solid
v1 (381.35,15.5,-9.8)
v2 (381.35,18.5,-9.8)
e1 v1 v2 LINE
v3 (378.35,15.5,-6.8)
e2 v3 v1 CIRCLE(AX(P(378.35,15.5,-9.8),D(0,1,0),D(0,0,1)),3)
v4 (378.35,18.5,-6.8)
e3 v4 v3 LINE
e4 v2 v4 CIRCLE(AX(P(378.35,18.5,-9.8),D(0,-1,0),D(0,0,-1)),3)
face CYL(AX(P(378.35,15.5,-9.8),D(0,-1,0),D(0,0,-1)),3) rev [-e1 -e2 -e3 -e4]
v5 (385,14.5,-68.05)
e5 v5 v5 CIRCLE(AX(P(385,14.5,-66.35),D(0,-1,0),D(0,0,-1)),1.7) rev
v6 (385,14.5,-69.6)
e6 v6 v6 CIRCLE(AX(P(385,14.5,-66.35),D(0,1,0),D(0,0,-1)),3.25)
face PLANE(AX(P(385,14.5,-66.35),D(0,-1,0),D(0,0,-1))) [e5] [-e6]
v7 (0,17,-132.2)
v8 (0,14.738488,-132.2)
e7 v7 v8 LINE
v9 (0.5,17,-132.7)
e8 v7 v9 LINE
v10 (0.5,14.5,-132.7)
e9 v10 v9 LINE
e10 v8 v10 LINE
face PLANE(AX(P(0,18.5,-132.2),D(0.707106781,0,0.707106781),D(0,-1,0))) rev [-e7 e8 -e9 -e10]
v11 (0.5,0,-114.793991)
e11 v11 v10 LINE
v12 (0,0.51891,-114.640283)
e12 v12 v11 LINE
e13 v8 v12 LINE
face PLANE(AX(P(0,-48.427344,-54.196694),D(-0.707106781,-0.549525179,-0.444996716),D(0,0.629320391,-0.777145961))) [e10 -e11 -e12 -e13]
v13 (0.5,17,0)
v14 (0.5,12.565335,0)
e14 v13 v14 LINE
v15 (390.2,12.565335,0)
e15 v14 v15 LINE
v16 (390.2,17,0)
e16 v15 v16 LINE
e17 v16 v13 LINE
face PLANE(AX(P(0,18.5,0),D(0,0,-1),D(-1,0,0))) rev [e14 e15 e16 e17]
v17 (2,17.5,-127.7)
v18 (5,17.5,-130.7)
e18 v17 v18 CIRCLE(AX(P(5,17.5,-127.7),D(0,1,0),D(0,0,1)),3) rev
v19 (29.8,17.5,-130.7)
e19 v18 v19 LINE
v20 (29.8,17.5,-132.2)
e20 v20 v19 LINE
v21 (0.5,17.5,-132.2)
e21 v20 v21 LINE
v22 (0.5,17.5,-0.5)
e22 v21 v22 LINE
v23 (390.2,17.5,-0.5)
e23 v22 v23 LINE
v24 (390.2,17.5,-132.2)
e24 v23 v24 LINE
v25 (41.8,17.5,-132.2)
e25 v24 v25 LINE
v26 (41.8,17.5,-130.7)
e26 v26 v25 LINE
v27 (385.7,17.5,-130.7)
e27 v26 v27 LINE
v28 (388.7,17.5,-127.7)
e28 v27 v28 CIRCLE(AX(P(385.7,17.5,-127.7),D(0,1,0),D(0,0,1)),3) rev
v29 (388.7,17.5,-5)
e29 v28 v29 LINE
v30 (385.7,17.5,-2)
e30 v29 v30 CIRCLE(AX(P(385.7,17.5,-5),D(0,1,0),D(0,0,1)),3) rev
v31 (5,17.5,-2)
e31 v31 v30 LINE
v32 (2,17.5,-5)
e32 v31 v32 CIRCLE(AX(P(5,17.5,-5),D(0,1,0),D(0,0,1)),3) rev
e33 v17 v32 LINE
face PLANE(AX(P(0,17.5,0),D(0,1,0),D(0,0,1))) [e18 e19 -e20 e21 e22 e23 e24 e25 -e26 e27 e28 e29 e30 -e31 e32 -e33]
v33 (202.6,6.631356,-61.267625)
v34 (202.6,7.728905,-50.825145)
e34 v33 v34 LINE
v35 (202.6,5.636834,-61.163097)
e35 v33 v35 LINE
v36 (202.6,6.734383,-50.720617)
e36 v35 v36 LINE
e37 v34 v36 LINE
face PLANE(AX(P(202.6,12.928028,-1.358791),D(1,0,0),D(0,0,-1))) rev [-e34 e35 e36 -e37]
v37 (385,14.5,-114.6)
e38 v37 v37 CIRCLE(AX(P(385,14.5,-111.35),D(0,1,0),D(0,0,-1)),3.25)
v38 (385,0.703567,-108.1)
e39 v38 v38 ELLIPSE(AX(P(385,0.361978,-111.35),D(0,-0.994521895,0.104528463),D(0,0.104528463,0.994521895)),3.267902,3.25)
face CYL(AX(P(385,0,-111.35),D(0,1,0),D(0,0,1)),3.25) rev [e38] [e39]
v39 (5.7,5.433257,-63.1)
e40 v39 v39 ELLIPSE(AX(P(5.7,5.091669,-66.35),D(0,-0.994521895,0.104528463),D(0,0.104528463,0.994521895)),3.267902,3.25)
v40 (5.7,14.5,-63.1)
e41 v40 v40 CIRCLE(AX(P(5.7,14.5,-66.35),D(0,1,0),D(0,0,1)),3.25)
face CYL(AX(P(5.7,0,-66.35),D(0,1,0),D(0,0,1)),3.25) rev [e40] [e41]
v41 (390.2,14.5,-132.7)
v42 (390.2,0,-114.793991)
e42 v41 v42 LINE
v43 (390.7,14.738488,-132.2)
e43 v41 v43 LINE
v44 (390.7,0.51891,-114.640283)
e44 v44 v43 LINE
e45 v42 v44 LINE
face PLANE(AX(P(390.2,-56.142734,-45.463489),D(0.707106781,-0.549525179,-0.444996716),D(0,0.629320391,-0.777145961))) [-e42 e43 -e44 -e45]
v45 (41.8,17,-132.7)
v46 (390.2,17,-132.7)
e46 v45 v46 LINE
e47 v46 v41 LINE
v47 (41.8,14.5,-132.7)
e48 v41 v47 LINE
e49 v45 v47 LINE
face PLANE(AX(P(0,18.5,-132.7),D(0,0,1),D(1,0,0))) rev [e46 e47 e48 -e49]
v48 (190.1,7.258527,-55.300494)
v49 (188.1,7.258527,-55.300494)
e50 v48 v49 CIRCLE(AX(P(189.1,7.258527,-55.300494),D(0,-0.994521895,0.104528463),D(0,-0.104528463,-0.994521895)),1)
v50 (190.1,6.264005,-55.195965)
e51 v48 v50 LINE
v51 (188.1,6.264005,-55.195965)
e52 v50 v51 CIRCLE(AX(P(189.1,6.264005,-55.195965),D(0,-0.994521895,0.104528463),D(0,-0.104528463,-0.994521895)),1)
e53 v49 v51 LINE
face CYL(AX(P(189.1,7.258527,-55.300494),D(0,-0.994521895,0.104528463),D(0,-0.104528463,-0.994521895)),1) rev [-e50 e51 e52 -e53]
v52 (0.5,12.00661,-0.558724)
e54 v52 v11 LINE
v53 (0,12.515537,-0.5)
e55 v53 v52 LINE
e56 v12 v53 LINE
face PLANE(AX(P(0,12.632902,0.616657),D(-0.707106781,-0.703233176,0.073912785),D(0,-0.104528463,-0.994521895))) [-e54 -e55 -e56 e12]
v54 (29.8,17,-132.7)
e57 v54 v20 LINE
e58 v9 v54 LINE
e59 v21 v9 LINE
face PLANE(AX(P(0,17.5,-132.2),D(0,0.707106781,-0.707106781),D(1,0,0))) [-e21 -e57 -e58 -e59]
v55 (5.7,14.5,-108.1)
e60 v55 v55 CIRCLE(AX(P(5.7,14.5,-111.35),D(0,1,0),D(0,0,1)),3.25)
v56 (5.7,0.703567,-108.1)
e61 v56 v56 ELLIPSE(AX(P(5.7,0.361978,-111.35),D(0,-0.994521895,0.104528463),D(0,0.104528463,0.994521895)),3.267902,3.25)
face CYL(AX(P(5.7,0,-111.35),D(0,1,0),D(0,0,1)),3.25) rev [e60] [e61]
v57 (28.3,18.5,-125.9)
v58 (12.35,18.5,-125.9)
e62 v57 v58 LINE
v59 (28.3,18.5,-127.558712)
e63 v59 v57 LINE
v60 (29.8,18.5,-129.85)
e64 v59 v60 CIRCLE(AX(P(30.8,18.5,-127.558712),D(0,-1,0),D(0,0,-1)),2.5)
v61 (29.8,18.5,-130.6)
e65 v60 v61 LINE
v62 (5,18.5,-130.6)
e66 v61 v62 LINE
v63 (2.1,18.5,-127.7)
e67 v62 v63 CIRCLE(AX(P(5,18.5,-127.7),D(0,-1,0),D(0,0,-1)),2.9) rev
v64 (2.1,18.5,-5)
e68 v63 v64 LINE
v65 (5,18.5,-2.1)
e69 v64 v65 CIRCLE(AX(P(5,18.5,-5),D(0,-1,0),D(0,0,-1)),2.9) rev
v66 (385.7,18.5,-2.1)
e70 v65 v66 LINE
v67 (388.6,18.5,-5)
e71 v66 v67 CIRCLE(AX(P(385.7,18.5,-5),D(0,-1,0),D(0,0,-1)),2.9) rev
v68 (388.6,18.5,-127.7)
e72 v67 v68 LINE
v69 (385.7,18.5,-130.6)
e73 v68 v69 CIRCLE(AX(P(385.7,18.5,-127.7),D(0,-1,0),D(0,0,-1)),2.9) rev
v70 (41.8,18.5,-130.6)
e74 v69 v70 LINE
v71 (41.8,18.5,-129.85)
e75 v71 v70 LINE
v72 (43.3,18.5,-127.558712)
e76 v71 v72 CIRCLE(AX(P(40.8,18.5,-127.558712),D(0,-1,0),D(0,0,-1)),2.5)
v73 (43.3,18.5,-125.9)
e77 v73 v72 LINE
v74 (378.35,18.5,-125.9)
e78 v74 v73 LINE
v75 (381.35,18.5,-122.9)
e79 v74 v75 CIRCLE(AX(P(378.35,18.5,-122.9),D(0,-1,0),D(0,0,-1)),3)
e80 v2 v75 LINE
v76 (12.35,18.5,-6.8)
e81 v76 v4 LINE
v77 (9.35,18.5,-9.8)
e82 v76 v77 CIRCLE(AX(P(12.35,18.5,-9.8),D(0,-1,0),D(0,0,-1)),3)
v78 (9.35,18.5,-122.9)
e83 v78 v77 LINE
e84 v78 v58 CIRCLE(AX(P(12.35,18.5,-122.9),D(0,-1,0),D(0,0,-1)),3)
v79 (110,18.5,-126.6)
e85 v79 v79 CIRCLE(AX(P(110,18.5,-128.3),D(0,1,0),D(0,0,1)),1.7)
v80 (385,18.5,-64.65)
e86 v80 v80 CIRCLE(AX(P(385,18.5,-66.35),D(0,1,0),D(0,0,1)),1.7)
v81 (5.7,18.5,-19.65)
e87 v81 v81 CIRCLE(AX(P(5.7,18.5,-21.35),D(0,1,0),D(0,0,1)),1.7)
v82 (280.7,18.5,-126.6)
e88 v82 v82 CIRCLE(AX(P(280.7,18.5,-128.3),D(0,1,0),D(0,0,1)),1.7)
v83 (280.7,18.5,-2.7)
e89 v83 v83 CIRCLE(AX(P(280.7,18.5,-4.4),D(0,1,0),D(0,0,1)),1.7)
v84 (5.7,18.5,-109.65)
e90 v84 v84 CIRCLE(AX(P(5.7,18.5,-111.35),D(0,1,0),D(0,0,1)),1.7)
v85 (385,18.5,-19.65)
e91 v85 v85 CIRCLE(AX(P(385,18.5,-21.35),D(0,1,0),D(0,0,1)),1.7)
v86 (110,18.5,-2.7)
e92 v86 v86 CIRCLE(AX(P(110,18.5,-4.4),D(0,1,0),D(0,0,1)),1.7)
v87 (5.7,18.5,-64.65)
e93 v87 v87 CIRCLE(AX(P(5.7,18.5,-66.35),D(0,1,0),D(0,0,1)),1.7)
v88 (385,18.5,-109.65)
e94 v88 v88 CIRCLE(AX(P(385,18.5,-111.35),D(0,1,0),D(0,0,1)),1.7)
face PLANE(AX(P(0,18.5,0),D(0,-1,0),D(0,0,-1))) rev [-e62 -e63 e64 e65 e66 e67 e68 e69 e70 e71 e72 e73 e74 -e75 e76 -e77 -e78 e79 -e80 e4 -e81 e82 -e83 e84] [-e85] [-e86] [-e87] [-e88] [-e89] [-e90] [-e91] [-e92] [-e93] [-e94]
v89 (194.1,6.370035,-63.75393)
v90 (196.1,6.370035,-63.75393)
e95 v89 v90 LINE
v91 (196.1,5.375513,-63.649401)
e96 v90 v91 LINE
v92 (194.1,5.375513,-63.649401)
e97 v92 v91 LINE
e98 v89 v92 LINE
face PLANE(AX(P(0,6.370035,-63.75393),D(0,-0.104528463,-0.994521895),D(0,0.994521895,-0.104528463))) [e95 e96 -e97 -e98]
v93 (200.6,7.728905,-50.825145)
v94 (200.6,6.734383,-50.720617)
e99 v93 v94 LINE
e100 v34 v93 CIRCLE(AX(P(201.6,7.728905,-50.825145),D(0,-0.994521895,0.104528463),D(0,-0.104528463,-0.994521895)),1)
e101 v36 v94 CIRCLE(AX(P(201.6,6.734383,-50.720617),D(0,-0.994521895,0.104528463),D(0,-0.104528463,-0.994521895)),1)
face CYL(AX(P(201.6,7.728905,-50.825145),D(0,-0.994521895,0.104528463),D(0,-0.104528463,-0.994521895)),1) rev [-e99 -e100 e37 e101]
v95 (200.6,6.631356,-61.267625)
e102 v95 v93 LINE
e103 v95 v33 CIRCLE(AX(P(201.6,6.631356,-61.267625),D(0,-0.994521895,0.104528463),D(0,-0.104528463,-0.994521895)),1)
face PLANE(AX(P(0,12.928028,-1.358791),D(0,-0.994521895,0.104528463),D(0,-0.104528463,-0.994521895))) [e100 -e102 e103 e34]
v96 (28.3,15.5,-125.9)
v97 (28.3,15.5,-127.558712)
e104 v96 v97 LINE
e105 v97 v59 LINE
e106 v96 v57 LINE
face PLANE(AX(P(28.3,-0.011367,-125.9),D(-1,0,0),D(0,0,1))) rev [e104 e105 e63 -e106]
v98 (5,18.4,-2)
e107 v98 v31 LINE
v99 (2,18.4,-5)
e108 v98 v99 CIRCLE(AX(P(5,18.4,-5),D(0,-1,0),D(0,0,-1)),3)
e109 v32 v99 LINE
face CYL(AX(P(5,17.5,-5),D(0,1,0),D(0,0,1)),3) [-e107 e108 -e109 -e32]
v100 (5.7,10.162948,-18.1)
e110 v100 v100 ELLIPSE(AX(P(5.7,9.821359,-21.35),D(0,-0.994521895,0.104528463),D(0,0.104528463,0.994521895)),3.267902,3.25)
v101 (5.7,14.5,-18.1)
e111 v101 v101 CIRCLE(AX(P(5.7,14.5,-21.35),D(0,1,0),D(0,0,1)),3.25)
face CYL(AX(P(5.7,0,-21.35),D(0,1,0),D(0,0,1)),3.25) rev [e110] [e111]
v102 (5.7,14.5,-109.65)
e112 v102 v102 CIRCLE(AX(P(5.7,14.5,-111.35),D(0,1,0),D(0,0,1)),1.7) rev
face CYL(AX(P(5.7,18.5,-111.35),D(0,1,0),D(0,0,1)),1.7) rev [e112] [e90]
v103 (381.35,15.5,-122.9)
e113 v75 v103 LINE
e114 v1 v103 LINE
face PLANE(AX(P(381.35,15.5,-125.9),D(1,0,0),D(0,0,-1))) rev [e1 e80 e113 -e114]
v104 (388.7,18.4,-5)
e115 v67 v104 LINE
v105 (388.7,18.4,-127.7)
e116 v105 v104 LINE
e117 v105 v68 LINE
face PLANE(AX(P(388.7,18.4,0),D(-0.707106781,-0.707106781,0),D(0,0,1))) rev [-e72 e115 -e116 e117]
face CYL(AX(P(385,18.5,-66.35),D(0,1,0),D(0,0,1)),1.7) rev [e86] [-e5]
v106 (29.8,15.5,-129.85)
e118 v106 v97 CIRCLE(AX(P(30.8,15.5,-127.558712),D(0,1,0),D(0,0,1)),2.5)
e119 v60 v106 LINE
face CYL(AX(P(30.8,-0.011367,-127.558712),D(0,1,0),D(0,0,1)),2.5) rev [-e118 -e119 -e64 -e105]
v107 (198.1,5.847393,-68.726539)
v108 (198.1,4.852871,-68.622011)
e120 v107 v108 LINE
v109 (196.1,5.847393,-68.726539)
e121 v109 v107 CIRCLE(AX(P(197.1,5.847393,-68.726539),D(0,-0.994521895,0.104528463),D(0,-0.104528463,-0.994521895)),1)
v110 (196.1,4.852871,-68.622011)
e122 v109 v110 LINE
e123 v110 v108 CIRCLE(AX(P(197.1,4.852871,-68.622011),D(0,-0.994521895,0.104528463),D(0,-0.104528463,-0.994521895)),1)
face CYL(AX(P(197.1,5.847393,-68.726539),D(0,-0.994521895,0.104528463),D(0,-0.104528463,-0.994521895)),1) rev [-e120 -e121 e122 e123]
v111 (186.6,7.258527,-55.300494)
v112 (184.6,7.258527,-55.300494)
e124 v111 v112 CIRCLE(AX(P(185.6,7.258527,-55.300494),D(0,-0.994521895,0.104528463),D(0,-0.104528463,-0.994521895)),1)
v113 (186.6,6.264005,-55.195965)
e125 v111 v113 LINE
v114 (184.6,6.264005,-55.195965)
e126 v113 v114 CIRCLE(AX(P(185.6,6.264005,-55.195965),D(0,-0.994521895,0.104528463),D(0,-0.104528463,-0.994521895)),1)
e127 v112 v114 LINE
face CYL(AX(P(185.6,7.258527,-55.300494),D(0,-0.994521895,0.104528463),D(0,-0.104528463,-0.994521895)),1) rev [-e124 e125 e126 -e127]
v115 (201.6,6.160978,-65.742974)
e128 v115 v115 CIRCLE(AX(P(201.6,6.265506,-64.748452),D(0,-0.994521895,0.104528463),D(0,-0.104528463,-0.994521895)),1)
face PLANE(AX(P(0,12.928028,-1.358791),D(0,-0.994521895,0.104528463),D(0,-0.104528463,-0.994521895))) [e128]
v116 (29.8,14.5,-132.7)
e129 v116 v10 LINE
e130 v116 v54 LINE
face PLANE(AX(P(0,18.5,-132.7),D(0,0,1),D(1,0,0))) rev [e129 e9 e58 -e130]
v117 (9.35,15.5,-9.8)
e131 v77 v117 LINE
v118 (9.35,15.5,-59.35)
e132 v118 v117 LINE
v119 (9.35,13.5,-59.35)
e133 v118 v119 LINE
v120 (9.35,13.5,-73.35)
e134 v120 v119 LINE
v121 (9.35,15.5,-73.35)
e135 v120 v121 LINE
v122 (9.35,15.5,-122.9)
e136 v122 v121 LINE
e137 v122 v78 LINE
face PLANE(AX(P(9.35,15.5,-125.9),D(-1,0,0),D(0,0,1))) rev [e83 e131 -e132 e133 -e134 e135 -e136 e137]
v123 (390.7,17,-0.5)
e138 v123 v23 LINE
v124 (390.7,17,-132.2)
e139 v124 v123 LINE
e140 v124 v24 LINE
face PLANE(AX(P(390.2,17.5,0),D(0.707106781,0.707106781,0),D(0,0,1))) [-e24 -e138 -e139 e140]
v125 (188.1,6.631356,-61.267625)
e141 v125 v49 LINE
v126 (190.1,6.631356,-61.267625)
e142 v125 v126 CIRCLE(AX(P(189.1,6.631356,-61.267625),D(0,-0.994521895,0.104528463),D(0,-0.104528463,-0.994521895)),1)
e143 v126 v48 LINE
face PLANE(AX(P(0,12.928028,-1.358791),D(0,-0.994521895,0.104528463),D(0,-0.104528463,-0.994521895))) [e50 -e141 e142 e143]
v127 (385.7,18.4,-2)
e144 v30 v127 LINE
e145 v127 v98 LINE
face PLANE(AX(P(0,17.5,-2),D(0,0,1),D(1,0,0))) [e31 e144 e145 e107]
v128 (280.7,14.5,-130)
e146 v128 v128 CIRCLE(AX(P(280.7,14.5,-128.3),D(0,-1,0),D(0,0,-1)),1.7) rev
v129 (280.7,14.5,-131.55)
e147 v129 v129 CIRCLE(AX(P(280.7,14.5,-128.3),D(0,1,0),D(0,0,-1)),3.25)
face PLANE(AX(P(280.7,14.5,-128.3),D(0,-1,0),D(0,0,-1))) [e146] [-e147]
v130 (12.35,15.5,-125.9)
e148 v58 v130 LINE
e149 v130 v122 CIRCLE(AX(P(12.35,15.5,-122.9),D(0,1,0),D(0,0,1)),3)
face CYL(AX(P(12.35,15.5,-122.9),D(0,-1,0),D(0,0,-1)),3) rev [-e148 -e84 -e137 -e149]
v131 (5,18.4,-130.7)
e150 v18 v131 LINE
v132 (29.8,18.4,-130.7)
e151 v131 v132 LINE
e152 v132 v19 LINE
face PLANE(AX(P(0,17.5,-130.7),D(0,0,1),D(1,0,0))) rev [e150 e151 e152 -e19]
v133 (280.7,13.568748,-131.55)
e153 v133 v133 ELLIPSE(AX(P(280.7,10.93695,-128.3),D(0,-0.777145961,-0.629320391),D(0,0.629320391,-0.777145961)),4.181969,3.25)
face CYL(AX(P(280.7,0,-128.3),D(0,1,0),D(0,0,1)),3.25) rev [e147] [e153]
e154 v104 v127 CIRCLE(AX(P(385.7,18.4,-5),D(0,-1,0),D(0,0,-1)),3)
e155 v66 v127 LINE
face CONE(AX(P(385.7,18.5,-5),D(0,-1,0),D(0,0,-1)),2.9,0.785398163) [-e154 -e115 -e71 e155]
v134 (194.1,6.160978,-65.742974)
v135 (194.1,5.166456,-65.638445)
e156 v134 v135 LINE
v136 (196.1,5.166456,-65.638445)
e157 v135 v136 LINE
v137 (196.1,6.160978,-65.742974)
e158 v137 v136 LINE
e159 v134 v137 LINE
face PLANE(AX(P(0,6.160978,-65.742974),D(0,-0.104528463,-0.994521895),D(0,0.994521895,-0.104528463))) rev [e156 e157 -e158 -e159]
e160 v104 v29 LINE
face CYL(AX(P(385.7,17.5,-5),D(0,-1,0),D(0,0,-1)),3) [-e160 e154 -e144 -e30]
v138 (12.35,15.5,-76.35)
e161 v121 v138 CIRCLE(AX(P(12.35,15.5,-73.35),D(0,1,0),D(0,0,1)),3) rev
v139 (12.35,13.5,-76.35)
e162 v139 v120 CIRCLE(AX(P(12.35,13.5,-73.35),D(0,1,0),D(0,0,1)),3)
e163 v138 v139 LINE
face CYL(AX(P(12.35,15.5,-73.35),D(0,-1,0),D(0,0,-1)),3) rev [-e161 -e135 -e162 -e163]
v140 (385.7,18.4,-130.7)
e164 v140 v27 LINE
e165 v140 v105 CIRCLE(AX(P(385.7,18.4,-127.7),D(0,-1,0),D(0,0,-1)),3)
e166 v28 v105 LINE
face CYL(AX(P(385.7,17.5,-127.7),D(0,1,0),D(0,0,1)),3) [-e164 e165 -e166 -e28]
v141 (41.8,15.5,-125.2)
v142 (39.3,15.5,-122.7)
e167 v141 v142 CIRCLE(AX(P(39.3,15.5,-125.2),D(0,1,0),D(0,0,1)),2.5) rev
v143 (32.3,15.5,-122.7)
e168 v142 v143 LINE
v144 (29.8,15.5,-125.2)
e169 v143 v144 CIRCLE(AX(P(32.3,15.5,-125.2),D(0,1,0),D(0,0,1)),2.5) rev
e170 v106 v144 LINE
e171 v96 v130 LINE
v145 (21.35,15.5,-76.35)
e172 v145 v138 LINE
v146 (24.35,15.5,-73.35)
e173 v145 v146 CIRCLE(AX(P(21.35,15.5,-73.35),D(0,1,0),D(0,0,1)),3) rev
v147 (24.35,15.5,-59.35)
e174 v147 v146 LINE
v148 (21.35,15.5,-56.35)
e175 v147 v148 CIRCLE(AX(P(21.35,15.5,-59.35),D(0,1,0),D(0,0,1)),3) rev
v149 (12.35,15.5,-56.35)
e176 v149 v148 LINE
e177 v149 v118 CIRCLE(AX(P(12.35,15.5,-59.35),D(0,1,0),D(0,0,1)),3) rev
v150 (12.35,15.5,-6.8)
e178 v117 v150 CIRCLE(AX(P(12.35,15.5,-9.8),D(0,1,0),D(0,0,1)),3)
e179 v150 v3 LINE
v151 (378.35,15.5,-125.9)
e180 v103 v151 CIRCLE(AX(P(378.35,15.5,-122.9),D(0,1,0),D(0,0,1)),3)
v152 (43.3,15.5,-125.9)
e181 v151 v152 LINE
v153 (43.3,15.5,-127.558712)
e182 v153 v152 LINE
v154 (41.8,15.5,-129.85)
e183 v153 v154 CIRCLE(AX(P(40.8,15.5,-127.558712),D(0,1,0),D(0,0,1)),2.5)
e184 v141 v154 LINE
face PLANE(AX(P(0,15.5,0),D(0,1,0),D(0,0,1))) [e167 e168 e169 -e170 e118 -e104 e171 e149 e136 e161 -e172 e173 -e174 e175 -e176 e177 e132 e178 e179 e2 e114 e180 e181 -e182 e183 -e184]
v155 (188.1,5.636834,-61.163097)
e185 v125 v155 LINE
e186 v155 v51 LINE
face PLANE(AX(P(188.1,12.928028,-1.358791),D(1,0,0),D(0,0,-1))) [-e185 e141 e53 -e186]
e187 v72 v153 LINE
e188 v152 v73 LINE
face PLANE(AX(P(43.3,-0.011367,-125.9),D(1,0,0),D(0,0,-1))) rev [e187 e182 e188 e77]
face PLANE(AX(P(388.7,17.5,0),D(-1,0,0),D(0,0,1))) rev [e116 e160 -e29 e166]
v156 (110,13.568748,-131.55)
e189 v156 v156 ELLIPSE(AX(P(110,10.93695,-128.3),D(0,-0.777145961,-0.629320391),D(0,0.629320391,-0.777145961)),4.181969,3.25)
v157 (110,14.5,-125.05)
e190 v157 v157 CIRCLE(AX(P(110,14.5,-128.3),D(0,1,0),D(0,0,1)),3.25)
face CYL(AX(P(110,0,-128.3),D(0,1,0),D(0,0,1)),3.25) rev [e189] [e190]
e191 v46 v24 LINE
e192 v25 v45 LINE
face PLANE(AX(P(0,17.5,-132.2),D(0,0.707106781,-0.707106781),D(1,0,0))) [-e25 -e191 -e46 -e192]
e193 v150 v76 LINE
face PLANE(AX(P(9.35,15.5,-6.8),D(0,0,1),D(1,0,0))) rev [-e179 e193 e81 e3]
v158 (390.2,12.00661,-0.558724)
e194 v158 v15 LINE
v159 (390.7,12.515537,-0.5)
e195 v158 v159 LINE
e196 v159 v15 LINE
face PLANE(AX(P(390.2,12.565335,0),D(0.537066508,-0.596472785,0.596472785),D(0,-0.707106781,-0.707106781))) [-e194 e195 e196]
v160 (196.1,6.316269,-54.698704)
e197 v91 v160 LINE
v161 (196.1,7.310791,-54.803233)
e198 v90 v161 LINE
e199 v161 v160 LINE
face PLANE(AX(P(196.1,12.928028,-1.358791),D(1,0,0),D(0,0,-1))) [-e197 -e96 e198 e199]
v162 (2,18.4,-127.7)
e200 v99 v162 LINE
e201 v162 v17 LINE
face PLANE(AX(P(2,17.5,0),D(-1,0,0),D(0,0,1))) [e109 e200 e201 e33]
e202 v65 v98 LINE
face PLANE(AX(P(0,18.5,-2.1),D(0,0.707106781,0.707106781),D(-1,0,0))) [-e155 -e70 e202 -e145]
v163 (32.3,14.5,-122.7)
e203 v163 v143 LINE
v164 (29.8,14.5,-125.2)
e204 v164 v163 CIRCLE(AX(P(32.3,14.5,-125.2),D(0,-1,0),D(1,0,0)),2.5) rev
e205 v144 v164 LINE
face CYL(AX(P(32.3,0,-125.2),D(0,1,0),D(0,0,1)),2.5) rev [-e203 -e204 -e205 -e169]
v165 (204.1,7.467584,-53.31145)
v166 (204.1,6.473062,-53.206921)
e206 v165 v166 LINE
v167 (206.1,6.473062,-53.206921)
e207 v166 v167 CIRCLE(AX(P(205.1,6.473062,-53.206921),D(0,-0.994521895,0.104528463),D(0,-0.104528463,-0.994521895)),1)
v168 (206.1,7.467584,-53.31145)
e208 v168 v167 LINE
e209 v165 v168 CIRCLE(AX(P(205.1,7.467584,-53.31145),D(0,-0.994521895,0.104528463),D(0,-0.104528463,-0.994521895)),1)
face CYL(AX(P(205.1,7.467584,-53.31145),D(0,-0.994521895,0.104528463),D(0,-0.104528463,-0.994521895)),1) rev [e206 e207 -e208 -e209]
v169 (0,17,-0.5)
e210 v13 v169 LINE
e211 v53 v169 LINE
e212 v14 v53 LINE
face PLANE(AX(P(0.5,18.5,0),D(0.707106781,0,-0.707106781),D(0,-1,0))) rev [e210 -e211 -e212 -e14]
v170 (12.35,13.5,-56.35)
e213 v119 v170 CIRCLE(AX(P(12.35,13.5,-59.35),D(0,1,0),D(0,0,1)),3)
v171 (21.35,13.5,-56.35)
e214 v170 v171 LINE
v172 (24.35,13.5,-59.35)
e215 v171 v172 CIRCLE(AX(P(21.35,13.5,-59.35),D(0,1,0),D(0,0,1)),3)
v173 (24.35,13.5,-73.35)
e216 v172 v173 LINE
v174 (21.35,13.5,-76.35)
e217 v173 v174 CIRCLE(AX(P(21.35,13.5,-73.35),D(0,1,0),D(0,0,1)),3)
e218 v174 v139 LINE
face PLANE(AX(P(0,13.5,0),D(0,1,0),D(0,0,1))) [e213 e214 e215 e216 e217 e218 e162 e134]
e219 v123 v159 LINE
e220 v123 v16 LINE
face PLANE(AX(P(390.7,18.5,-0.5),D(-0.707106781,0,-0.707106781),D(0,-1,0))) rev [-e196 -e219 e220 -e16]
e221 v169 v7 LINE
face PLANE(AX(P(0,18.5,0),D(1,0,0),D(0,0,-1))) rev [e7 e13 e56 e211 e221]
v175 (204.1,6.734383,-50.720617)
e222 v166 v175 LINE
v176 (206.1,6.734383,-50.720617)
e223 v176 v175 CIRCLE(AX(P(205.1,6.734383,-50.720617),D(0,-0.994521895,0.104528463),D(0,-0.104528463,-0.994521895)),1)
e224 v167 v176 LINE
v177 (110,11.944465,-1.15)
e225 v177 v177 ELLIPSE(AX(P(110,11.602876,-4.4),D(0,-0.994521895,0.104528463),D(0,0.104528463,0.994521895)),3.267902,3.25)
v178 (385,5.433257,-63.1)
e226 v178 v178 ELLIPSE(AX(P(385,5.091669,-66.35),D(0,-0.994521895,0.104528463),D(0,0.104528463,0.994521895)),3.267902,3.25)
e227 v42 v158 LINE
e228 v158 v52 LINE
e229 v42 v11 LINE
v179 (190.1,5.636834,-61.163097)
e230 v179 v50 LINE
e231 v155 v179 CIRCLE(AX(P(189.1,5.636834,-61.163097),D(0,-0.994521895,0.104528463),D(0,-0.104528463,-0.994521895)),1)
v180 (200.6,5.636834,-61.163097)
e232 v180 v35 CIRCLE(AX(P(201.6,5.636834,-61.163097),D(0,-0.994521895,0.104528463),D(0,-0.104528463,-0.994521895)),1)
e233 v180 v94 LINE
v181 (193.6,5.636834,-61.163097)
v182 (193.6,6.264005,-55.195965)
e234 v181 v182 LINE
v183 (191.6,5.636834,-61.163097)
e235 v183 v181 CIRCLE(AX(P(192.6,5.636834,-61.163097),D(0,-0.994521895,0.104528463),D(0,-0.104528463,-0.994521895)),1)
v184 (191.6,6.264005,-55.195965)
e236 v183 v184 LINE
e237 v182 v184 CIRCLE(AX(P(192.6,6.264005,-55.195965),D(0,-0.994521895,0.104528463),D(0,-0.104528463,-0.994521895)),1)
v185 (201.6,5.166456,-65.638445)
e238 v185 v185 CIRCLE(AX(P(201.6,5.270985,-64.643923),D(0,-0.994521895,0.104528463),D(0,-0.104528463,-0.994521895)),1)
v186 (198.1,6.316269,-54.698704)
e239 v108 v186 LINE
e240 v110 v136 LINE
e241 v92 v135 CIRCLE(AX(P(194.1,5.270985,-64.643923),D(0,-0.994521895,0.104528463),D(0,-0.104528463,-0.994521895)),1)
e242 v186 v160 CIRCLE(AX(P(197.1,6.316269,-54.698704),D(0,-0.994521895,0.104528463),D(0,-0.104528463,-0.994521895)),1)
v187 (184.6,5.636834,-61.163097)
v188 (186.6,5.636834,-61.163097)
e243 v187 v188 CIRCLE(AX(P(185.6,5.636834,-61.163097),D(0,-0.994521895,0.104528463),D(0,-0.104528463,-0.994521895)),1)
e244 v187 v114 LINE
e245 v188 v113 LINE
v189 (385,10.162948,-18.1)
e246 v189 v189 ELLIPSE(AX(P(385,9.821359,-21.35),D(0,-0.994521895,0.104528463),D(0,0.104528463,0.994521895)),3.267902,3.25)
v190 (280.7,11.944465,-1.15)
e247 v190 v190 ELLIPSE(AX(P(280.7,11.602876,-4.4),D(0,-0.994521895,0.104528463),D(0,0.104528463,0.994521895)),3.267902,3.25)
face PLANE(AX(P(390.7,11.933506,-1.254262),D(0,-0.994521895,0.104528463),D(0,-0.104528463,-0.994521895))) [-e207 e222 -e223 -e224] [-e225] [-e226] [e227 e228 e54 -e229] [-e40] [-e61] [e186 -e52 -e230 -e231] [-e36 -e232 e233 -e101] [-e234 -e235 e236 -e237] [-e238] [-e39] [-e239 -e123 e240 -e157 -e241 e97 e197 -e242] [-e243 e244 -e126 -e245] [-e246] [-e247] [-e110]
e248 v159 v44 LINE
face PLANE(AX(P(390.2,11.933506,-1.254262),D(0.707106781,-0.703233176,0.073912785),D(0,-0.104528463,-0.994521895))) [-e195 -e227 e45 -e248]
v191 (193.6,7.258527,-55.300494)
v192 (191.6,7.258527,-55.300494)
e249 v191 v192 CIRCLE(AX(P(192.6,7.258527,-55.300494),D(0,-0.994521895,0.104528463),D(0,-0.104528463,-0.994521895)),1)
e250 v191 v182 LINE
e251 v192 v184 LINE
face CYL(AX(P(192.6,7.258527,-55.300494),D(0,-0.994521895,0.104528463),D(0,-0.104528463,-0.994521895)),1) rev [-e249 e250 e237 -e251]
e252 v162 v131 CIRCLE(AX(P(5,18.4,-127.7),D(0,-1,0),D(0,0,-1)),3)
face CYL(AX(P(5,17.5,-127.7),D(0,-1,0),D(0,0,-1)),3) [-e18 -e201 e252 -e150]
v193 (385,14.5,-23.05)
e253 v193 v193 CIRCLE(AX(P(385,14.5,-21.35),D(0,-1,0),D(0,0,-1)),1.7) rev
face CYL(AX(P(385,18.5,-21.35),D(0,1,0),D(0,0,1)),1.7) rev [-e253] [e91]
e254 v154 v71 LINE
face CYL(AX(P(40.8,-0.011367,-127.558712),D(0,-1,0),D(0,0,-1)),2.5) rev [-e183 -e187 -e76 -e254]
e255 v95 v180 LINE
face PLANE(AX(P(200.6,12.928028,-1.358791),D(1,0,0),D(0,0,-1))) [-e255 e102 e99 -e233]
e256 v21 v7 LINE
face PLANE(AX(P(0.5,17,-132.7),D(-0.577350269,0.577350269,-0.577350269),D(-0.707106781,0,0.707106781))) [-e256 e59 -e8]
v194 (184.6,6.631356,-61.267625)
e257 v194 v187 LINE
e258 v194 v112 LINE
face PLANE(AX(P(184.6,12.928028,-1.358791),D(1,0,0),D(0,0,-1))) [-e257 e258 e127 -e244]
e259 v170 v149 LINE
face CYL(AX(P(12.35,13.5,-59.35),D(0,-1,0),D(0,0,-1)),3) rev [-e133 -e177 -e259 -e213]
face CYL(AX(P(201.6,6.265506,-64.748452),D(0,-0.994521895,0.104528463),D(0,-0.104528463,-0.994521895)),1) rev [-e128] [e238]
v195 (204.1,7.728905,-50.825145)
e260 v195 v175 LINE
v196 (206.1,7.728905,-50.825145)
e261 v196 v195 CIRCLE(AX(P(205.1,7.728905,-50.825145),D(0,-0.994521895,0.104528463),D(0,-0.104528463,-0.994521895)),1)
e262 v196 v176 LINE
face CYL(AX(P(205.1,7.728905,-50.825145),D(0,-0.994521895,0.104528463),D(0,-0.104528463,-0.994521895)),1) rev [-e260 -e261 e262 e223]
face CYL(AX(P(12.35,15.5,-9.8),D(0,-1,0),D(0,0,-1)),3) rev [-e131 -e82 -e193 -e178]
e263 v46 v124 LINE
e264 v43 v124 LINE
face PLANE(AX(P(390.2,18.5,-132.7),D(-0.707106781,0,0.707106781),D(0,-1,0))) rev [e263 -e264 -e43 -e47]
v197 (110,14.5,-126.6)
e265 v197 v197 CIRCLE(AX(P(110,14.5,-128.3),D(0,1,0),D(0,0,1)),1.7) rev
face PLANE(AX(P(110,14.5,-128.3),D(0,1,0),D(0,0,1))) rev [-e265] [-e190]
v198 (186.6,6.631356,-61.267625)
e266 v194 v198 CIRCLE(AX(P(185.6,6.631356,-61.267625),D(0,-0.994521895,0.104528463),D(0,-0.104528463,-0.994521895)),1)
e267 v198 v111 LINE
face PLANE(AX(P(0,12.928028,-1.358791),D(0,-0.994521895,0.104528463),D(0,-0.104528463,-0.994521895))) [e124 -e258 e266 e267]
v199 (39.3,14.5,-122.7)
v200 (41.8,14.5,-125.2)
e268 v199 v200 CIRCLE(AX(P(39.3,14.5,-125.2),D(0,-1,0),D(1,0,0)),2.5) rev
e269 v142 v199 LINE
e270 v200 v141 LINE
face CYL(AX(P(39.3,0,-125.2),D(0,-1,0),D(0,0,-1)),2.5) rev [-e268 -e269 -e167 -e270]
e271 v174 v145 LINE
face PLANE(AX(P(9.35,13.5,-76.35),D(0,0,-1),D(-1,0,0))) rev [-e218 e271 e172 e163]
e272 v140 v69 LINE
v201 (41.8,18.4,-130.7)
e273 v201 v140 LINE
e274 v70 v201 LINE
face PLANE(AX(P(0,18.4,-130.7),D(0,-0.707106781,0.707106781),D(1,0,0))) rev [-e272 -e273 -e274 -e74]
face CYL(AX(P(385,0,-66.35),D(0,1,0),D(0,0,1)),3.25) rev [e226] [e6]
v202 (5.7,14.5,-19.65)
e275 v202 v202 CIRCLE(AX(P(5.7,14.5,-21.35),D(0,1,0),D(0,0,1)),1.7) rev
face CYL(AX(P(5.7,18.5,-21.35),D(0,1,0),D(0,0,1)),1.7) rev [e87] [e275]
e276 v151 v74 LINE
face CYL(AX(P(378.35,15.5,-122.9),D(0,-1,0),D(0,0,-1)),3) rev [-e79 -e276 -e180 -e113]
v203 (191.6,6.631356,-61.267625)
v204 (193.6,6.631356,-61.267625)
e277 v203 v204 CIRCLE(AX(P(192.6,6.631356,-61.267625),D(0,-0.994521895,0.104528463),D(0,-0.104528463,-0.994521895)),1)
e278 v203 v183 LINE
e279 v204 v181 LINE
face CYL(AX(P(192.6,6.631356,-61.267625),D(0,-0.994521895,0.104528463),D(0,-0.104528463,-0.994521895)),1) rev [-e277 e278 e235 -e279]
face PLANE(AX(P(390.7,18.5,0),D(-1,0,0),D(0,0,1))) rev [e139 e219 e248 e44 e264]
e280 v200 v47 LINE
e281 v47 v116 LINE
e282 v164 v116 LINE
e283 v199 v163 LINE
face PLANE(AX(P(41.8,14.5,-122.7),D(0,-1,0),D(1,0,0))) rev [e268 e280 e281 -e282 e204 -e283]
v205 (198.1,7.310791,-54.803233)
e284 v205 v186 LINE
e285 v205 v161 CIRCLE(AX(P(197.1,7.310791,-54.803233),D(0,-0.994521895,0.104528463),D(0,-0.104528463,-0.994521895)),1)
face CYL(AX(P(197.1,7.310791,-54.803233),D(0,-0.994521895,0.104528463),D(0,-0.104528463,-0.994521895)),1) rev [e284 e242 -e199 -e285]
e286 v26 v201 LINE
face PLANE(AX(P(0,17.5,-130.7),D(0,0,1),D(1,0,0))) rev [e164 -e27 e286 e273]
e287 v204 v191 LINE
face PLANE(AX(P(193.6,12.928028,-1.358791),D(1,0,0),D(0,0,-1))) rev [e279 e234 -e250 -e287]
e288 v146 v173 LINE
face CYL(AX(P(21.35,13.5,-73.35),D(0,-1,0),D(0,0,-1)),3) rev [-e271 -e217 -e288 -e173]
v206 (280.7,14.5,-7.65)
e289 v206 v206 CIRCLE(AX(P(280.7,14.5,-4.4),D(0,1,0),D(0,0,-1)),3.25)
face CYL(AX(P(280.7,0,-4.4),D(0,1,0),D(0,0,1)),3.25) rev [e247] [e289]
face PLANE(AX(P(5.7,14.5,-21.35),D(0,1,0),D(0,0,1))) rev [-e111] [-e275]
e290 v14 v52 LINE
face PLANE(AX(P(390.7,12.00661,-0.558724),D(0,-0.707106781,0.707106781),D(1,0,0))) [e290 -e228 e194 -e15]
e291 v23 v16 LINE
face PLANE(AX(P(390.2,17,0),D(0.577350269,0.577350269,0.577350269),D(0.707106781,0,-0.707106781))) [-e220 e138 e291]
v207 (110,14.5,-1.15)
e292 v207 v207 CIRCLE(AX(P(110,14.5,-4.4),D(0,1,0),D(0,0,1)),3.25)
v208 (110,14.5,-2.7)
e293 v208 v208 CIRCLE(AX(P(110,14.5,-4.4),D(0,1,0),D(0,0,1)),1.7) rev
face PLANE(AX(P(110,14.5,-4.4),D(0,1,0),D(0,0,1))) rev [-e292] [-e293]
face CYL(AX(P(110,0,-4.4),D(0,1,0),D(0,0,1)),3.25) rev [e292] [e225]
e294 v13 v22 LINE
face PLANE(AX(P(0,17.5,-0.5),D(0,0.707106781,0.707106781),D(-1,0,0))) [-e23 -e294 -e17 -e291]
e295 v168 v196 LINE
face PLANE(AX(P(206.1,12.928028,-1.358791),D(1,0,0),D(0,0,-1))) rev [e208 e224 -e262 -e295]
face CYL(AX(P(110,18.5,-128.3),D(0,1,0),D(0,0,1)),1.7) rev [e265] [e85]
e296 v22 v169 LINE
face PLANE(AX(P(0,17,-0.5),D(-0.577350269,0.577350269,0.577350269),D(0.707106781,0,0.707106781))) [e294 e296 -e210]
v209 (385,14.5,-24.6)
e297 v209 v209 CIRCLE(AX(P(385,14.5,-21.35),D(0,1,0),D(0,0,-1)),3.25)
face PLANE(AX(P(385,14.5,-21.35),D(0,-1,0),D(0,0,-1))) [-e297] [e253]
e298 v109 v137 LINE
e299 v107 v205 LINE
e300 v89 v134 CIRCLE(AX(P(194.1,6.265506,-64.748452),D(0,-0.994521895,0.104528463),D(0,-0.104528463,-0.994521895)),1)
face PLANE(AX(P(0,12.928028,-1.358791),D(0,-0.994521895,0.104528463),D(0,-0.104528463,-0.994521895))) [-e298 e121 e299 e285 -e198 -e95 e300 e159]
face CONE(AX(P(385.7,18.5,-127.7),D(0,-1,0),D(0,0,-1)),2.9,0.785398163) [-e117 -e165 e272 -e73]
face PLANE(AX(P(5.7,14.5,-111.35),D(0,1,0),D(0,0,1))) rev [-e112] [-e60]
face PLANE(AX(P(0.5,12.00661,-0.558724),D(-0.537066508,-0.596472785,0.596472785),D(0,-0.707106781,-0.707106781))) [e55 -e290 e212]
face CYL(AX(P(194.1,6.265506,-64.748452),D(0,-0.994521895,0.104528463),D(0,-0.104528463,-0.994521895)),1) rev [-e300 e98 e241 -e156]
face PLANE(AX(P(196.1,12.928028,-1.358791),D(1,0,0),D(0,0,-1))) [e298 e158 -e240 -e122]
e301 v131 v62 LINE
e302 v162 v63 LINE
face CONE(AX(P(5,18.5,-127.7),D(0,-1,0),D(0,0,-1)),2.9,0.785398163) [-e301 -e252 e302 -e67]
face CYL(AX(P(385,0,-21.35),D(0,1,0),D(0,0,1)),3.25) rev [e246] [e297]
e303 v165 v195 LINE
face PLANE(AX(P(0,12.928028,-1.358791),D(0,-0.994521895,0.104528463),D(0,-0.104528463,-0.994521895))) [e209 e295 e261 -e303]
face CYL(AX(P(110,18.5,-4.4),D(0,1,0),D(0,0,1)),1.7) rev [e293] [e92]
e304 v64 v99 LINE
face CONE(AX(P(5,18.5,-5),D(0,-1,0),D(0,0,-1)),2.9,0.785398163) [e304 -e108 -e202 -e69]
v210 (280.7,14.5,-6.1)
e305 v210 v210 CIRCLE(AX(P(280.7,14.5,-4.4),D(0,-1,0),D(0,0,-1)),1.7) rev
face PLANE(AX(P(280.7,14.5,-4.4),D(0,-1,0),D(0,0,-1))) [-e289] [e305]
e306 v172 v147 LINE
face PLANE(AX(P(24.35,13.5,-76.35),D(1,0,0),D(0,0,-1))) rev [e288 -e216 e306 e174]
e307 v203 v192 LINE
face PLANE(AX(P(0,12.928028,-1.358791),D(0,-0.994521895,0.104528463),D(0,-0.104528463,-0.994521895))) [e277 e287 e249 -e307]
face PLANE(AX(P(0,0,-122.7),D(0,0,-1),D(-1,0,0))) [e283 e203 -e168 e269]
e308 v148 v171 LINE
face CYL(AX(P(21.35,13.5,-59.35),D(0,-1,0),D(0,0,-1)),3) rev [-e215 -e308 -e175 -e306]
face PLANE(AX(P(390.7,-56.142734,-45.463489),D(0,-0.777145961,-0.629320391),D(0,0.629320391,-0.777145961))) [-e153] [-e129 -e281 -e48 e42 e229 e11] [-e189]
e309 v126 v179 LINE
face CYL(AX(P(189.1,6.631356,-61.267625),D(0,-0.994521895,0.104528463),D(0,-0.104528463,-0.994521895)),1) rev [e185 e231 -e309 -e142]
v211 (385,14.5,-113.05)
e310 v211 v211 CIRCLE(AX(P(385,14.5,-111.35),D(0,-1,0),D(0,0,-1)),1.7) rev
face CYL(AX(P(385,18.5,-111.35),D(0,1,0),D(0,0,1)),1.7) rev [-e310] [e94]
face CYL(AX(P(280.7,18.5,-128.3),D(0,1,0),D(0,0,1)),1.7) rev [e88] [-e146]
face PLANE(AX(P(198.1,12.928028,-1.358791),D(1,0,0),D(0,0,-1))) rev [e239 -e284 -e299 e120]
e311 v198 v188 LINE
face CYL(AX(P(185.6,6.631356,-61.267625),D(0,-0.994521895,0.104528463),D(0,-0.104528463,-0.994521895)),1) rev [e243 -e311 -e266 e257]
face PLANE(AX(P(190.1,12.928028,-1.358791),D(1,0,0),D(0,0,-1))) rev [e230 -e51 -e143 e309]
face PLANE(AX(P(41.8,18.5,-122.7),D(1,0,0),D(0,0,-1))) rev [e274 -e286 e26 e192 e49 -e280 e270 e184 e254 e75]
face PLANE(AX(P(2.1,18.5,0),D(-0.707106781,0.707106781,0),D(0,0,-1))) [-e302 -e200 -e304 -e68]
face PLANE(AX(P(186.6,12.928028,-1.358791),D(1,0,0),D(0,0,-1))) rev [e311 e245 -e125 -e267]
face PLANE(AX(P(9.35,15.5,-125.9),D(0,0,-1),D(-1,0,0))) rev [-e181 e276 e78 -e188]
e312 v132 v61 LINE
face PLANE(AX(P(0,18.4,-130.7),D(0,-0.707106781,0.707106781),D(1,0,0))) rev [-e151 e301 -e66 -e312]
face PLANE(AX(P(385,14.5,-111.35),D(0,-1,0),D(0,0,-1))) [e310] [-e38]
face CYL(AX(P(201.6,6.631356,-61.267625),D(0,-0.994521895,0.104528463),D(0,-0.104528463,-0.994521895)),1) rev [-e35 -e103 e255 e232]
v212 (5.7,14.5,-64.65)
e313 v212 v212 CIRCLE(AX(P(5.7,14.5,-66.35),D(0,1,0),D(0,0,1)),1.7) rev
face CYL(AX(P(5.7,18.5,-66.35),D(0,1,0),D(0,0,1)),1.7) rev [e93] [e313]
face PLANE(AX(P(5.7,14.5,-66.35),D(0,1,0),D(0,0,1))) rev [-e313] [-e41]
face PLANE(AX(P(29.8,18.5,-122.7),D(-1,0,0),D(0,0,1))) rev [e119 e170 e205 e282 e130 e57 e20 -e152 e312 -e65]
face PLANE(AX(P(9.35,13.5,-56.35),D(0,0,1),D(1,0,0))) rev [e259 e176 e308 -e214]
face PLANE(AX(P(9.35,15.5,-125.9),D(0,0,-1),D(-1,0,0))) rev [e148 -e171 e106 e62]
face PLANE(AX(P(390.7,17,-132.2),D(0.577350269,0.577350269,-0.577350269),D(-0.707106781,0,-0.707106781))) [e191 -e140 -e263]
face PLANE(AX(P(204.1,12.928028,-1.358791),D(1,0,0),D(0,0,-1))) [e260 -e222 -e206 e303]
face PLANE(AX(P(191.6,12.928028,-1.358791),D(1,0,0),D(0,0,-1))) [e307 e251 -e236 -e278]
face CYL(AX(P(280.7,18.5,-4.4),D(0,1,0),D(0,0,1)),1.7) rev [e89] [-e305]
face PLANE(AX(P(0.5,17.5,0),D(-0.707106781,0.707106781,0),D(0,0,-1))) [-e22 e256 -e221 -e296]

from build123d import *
from OCP.BRepFilletAPI import BRepFilletAPI_MakeChamfer

# Parameters (mm, degrees)
SKETCH1_W            = 390.7
SKETCH1_H            = 132.7
MAINBODY_DEPTH       = 18.5
SKETCH2_W            = 390.7
SKETCH2_H            = 132.7
SKETCH2_W_2          = 386.7
SKETCH2_H_2          = 128.7
ALIGMENTLIP_DEPTH    = 1
TYPINGANGLE_DEPTH    = 414.035143783
SKETCH4_W            = 372
SKETCH4_H            = 119.1
PCBCUTOUT_DEPTH      = 3
M3_CLEARANCE_HOLE1_D = 3.4
CUT_EXTRUDE2_START   = -1
SKETCH11_R           = 3.25
CUT_EXTRUDE2_DEPTH   = 412.911649145
SKETCH13_W           = 15
SKETCH13_H           = 20
CUT_EXTRUDE4_DEPTH   = 2
FILLET2_R            = 3
CHAMFER1_SIZE        = 0.5
CHAMFER1_SIZE2       = 0.561801899
CHAMFER2_SIZE        = 0.1
SKETCH17_R           = 1
SKETCH17_W           = 2
SKETCH17_H           = 2
CUT_EXTRUDE5_DEPTH   = 1
SKETCH18_W           = 12
SKETCH18_H           = 4
CUT_EXTRUDE6_DEPTH   = 10
SKETCH12_W           = 15
SKETCH12_H           = 3.95
CUT_EXTRUDE3_DEPTH   = 3
FILLET1_R            = 2.5


with BuildPart() as part:
    # Sketch1 → MainBody (new body)
    with BuildSketch(Plane(origin=(0, 0, 0), x_dir=(1, 0, 0), z_dir=(0, 1, 0))):
        with Locations((195.35, 66.35)):
            Rectangle(SKETCH1_W, SKETCH1_H)
    extrude(amount=MAINBODY_DEPTH)

    # Sketch2 → AligmentLip (cut)
    with BuildSketch(Plane(origin=(0, 18.5, 0), x_dir=(1, 0, 0), z_dir=(0, 1, 0))):
        with Locations((195.35, 66.35)):
            Rectangle(SKETCH2_W, SKETCH2_H)
        with Locations((195.35, 66.35)):
            Rectangle(SKETCH2_W_2, SKETCH2_H_2, mode=Mode.SUBTRACT)
    extrude(amount=-ALIGMENTLIP_DEPTH, mode=Mode.SUBTRACT)

    # Sketch3 → TypingAngle (cut, through all)
    with BuildSketch(Plane.ZY):
        Polygon((-114.79399123, 0), (-132.7, 14.5), (-132.7, 0), align=None)
        Polygon((0, 12.065334661), (-114.79399123, 0), (0, 0), align=None)
    extrude(amount=-TYPINGANGLE_DEPTH, mode=Mode.SUBTRACT)

    # Sketch4 → PCBCutout (cut)
    with BuildSketch(Plane(origin=(0, 18.5, 0), x_dir=(1, 0, 0), z_dir=(0, 1, 0))):
        with Locations((195.35, 66.35)):
            Rectangle(SKETCH4_W, SKETCH4_H)
    extrude(amount=-PCBCUTOUT_DEPTH, mode=Mode.SUBTRACT)

    # M3 Clearance Hole1 (through all)
    with Locations(Plane(origin=(110, 18.5, -128.3), x_dir=(0, 0, 1), z_dir=(0, 1, 0))):
        with Locations((0, 0), (16.95, -104.3), (61.95, -104.3), (106.95, -104.3), (123.9, 0), (0, 170.7), (123.9, 170.7), (106.95, 275), (61.95, 275), (16.95, 275)):
            Hole(M3_CLEARANCE_HOLE1_D / 2)

    # Sketch11 → Cut-Extrude2 (cut, through all)
    with BuildSketch(Plane(origin=(0, 15.5, 0), x_dir=(1, 0, 0), z_dir=(0, 1, 0)).offset(CUT_EXTRUDE2_START)):
        with Locations(Location((110, 128.3, 0), (0, 0, 270))):
            Circle(SKETCH11_R)
        with Locations(Location((5.7, 111.35, 0), (0, 0, 270))):
            Circle(SKETCH11_R)
        with Locations(Location((5.7, 66.35, 0), (0, 0, 270))):
            Circle(SKETCH11_R)
        with Locations(Location((5.7, 21.35, 0), (0, 0, 270))):
            Circle(SKETCH11_R)
        with Locations(Location((110, 4.4, 0), (0, 0, 270))):
            Circle(SKETCH11_R)
        with Locations(Location((280.7, 4.4, 0), (0, 0, 270))):
            Circle(SKETCH11_R)
        with Locations(Location((385, 21.35, 0), (0, 0, 270))):
            Circle(SKETCH11_R)
        with Locations(Location((385, 66.35, 0), (0, 0, 270))):
            Circle(SKETCH11_R)
        with Locations(Location((385, 111.35, 0), (0, 0, 270))):
            Circle(SKETCH11_R)
        with Locations(Location((280.7, 128.3, 0), (0, 0, 90))):
            Circle(SKETCH11_R)
    extrude(amount=-CUT_EXTRUDE2_DEPTH, mode=Mode.SUBTRACT)

    # Sketch13 → Cut-Extrude4 (cut)
    with BuildSketch(Plane(origin=(0, 15.5, 0), x_dir=(1, 0, 0), z_dir=(0, 1, 0))):
        with Locations((16.85, 66.35)):
            Rectangle(SKETCH13_W, SKETCH13_H)
    extrude(amount=-CUT_EXTRUDE4_DEPTH, mode=Mode.SUBTRACT)

    # Fillet2
    fillet2_edges = [part.edges().sort_by_distance(p)[0] for p in [
        (388.7, 18, -130.7),
        (2, 18, -130.7),
        (2, 18, -2),
        (9.35, 14.5, -56.35),
        (9.35, 14.5, -76.35),
        (24.35, 14.5, -76.35),
        (24.35, 14.5, -56.35),
        (388.7, 18, -2),
        (9.35, 17, -6.8),
        (9.35, 17, -125.9),
        (381.35, 17, -125.9),
        (381.35, 17, -6.8),
    ]]
    fillet(fillet2_edges, radius=FILLET2_R)

    # Chamfer1: one chamfer whose edges measure the first distance from different faces: ONE call of the kernel's chamfer builder (chamfer() names one face for all edges)
    chamfer1_edges_1 = [part.edges().sort_by_distance(p)[0] for p in [
        (0, 16, -132.7),
        (390.7, 16, -132.7),
        (390.7, 14.782667331, 0),
        (0, 14.782667331, 0),
        (195.35, 17.5, -132.7),
        (390.7, 17.5, -66.35),
        (195.35, 17.5, 0),
        (0, 17.5, -66.35),
        (0, 7.25, -123.746995615),
        (390.7, 7.25, -123.746995615),
        (0, 6.032667331, -57.396995615),
        (390.7, 6.032667331, -57.396995615),
    ]]
    chamfer1_edges_2 = [part.edges().sort_by_distance(p)[0] for p in [
        (195.35, 12.065334661, 0),
    ]]
    chamfer1_side_2 = [part.faces().sort_by_distance(p)[0] for p in [
        (195.35, 14.782667331, 0),
    ]]
    chamfer1 = BRepFilletAPI_MakeChamfer(part.part.solid().wrapped)
    for e in chamfer1_edges_1:
        chamfer1.Add(CHAMFER1_SIZE, e.wrapped)
    for e in chamfer1_edges_2:
        chamfer1.Add(CHAMFER1_SIZE, CHAMFER1_SIZE2, e.wrapped, chamfer1_side_2[0].wrapped)  # the first distance lies on this face
    add(Compound.cast(chamfer1.Shape()), mode=Mode.REPLACE)

    # Chamfer2
    chamfer2_edges = [part.edges().sort_by_distance(p)[0] for p in [
        (388.7, 18.5, -66.35),
        (195.35, 18.5, -130.7),
        (2, 18.5, -66.35),
        (195.35, 18.5, -2),
        (2.878679656, 18.5, -129.821320344),
        (2.878679656, 18.5, -2.878679656),
        (387.821320344, 18.5, -2.878679656),
        (387.821320344, 18.5, -129.821320344),
    ]]
    chamfer(chamfer2_edges, length=CHAMFER2_SIZE)

    # Sketch17 → Cut-Extrude5 (cut)
    with BuildSketch(Plane(origin=(0, 11.933506406, -1.254262065), x_dir=(1, 0, 0), z_dir=(0, -0.9945218953682734, 0.10452846326765429))):
        with Locations((205.1, -52.238829109)):
            Circle(SKETCH17_R)
        with BuildLine():
            ThreePointArc((204.1, -52.238829109), (205.1, -51.238829109), (206.1, -52.238829109))
            Line((206.1, -52.238829109), (206.1, -49.738829109))
            ThreePointArc((206.1, -49.738829109), (205.1, -50.738829109), (204.1, -49.738829109))
            Line((204.1, -49.738829109), (204.1, -52.238829109))
        make_face()
        with Locations((205.1, -49.738829109)):
            Circle(SKETCH17_R)
        with Locations((201.6, -49.738829109)):
            Circle(SKETCH17_R)
        with BuildLine():
            ThreePointArc((200.6, -60.238829109), (201.6, -59.238829109), (202.6, -60.238829109))
            Line((202.6, -60.238829109), (202.6, -49.738829109))
            ThreePointArc((202.6, -49.738829109), (201.6, -50.738829109), (200.6, -49.738829109))
            Line((200.6, -49.738829109), (200.6, -60.238829109))
        make_face()
        with Locations((201.6, -60.238829109)):
            Circle(SKETCH17_R)
        with Locations((197.1, -53.738829109)):
            Circle(SKETCH17_R)
        with BuildLine():
            Line((196.1, -62.738829109), (198.1, -62.738829109))
            Line((198.1, -62.738829109), (198.1, -53.738829109))
            ThreePointArc((198.1, -53.738829109), (197.1, -54.738829109), (196.1, -53.738829109))
            Line((196.1, -53.738829109), (196.1, -62.738829109))
        make_face()
        with Locations((197.1, -63.738829109)):
            Rectangle(SKETCH17_W, SKETCH17_H)
        with BuildLine():
            ThreePointArc((196.1, -67.738829109), (197.1, -66.738829109), (198.1, -67.738829109))
            Line((198.1, -67.738829109), (198.1, -64.738829109))
            Line((198.1, -64.738829109), (196.1, -64.738829109))
            Line((196.1, -64.738829109), (196.1, -67.738829109))
        make_face()
        with Locations((197.1, -67.738829109)):
            Circle(SKETCH17_R)
        with BuildLine():
            Line((194.1, -64.738829109), (196.1, -64.738829109))
            Line((196.1, -64.738829109), (196.1, -62.738829109))
            Line((196.1, -62.738829109), (194.1, -62.738829109))
            ThreePointArc((194.1, -62.738829109), (194.807106781, -63.031722328), (195.1, -63.738829109))
            ThreePointArc((195.1, -63.738829109), (194.807106781, -64.44593589), (194.1, -64.738829109))
        make_face()
        with Locations((194.1, -63.738829109)):
            Circle(SKETCH17_R)
        with Locations(Location((201.6, -63.738829109, 0), (0, 0, 270))):
            Circle(SKETCH17_R)
        with Locations((192.6, -60.238829109)):
            Circle(SKETCH17_R)
        with BuildLine():
            ThreePointArc((191.6, -60.238829109), (192.6, -59.238829109), (193.6, -60.238829109))
            Line((193.6, -60.238829109), (193.6, -54.238829109))
            ThreePointArc((193.6, -54.238829109), (192.6, -55.238829109), (191.6, -54.238829109))
            Line((191.6, -54.238829109), (191.6, -60.238829109))
        make_face()
        with Locations((192.6, -54.238829109)):
            Circle(SKETCH17_R)
        with BuildLine():
            ThreePointArc((188.1, -60.238829109), (189.1, -59.238829109), (190.1, -60.238829109))
            Line((190.1, -60.238829109), (190.1, -54.238829109))
            ThreePointArc((190.1, -54.238829109), (189.1, -55.238829109), (188.1, -54.238829109))
            Line((188.1, -54.238829109), (188.1, -60.238829109))
        make_face()
        with Locations((189.1, -60.238829109)):
            Circle(SKETCH17_R)
        with Locations((189.1, -54.238829109)):
            Circle(SKETCH17_R)
        with Locations((185.6, -54.238829109)):
            Circle(SKETCH17_R)
        with BuildLine():
            ThreePointArc((184.6, -60.238829109), (185.6, -59.238829109), (186.6, -60.238829109))
            Line((186.6, -60.238829109), (186.6, -54.238829109))
            ThreePointArc((186.6, -54.238829109), (185.6, -55.238829109), (184.6, -54.238829109))
            Line((184.6, -54.238829109), (184.6, -60.238829109))
        make_face()
        with Locations((185.6, -60.238829109)):
            Circle(SKETCH17_R)
    extrude(amount=-CUT_EXTRUDE5_DEPTH, mode=Mode.SUBTRACT)

    # Sketch18 → Cut-Extrude6 (cut)
    with BuildSketch(Plane(origin=(0, 0, -132.7), x_dir=(-1, 0, 0), z_dir=(0, 0, -1))):
        with Locations((-35.8, 16.5)):
            Rectangle(SKETCH18_W, SKETCH18_H)
    extrude(amount=-CUT_EXTRUDE6_DEPTH, mode=Mode.SUBTRACT)

    # Sketch12 → Cut-Extrude3 (cut)
    with BuildSketch(Plane(origin=(0, 18.5, 0), x_dir=(1, 0, 0), z_dir=(0, 1, 0))):
        with Locations((35.8, 127.875)):
            Rectangle(SKETCH12_W, SKETCH12_H)
    extrude(amount=-CUT_EXTRUDE3_DEPTH, mode=Mode.SUBTRACT)

    # Fillet1
    # the kernel refuses this fillet: 2.5 mm, written as the material it adds along each edge
    with BuildSketch(Plane(origin=(43.3, 18.5, -129.85), x_dir=(-1, 0, 0), z_dir=(0, -1, 0))) as fillet1_piece_1:
        with BuildLine():
            CenterArc((2.5, -2.291287847), FILLET1_R, 113.578178478, 66.421821522)
            Line((0, -2.291287847), (0, 0))
            Line((0, 0), (1.5, 0))
        make_face()
    extrude(amount=3)
    with BuildSketch(Plane(origin=(28.3, 18.5, -129.85), x_dir=(0, 0, 1), z_dir=(0, -1, 0))) as fillet1_piece_2:
        with BuildLine():
            CenterArc((2.291287847, -2.5), FILLET1_R, 90, 66.421821522)
            Line((0, -1.5), (0, 0))
            Line((0, 0), (2.291287847, 0))
        make_face()
    extrude(amount=3)
    with BuildSketch(Plane(origin=(41.8, 14.5, -122.7), x_dir=(-1, 0, 0), z_dir=(0, 1, 0)), Plane(origin=(29.8, 15.5, -122.7), x_dir=(1, 0, 0), z_dir=(0, -1, 0))) as fillet1_piece_3:
        with BuildLine():
            CenterArc((FILLET1_R, -FILLET1_R), FILLET1_R, 90, 90)
            Line((0, -FILLET1_R), (0, 0))
            Line((0, 0), (FILLET1_R, 0))
        make_face()
    extrude(amount=1)


solid = part.part
